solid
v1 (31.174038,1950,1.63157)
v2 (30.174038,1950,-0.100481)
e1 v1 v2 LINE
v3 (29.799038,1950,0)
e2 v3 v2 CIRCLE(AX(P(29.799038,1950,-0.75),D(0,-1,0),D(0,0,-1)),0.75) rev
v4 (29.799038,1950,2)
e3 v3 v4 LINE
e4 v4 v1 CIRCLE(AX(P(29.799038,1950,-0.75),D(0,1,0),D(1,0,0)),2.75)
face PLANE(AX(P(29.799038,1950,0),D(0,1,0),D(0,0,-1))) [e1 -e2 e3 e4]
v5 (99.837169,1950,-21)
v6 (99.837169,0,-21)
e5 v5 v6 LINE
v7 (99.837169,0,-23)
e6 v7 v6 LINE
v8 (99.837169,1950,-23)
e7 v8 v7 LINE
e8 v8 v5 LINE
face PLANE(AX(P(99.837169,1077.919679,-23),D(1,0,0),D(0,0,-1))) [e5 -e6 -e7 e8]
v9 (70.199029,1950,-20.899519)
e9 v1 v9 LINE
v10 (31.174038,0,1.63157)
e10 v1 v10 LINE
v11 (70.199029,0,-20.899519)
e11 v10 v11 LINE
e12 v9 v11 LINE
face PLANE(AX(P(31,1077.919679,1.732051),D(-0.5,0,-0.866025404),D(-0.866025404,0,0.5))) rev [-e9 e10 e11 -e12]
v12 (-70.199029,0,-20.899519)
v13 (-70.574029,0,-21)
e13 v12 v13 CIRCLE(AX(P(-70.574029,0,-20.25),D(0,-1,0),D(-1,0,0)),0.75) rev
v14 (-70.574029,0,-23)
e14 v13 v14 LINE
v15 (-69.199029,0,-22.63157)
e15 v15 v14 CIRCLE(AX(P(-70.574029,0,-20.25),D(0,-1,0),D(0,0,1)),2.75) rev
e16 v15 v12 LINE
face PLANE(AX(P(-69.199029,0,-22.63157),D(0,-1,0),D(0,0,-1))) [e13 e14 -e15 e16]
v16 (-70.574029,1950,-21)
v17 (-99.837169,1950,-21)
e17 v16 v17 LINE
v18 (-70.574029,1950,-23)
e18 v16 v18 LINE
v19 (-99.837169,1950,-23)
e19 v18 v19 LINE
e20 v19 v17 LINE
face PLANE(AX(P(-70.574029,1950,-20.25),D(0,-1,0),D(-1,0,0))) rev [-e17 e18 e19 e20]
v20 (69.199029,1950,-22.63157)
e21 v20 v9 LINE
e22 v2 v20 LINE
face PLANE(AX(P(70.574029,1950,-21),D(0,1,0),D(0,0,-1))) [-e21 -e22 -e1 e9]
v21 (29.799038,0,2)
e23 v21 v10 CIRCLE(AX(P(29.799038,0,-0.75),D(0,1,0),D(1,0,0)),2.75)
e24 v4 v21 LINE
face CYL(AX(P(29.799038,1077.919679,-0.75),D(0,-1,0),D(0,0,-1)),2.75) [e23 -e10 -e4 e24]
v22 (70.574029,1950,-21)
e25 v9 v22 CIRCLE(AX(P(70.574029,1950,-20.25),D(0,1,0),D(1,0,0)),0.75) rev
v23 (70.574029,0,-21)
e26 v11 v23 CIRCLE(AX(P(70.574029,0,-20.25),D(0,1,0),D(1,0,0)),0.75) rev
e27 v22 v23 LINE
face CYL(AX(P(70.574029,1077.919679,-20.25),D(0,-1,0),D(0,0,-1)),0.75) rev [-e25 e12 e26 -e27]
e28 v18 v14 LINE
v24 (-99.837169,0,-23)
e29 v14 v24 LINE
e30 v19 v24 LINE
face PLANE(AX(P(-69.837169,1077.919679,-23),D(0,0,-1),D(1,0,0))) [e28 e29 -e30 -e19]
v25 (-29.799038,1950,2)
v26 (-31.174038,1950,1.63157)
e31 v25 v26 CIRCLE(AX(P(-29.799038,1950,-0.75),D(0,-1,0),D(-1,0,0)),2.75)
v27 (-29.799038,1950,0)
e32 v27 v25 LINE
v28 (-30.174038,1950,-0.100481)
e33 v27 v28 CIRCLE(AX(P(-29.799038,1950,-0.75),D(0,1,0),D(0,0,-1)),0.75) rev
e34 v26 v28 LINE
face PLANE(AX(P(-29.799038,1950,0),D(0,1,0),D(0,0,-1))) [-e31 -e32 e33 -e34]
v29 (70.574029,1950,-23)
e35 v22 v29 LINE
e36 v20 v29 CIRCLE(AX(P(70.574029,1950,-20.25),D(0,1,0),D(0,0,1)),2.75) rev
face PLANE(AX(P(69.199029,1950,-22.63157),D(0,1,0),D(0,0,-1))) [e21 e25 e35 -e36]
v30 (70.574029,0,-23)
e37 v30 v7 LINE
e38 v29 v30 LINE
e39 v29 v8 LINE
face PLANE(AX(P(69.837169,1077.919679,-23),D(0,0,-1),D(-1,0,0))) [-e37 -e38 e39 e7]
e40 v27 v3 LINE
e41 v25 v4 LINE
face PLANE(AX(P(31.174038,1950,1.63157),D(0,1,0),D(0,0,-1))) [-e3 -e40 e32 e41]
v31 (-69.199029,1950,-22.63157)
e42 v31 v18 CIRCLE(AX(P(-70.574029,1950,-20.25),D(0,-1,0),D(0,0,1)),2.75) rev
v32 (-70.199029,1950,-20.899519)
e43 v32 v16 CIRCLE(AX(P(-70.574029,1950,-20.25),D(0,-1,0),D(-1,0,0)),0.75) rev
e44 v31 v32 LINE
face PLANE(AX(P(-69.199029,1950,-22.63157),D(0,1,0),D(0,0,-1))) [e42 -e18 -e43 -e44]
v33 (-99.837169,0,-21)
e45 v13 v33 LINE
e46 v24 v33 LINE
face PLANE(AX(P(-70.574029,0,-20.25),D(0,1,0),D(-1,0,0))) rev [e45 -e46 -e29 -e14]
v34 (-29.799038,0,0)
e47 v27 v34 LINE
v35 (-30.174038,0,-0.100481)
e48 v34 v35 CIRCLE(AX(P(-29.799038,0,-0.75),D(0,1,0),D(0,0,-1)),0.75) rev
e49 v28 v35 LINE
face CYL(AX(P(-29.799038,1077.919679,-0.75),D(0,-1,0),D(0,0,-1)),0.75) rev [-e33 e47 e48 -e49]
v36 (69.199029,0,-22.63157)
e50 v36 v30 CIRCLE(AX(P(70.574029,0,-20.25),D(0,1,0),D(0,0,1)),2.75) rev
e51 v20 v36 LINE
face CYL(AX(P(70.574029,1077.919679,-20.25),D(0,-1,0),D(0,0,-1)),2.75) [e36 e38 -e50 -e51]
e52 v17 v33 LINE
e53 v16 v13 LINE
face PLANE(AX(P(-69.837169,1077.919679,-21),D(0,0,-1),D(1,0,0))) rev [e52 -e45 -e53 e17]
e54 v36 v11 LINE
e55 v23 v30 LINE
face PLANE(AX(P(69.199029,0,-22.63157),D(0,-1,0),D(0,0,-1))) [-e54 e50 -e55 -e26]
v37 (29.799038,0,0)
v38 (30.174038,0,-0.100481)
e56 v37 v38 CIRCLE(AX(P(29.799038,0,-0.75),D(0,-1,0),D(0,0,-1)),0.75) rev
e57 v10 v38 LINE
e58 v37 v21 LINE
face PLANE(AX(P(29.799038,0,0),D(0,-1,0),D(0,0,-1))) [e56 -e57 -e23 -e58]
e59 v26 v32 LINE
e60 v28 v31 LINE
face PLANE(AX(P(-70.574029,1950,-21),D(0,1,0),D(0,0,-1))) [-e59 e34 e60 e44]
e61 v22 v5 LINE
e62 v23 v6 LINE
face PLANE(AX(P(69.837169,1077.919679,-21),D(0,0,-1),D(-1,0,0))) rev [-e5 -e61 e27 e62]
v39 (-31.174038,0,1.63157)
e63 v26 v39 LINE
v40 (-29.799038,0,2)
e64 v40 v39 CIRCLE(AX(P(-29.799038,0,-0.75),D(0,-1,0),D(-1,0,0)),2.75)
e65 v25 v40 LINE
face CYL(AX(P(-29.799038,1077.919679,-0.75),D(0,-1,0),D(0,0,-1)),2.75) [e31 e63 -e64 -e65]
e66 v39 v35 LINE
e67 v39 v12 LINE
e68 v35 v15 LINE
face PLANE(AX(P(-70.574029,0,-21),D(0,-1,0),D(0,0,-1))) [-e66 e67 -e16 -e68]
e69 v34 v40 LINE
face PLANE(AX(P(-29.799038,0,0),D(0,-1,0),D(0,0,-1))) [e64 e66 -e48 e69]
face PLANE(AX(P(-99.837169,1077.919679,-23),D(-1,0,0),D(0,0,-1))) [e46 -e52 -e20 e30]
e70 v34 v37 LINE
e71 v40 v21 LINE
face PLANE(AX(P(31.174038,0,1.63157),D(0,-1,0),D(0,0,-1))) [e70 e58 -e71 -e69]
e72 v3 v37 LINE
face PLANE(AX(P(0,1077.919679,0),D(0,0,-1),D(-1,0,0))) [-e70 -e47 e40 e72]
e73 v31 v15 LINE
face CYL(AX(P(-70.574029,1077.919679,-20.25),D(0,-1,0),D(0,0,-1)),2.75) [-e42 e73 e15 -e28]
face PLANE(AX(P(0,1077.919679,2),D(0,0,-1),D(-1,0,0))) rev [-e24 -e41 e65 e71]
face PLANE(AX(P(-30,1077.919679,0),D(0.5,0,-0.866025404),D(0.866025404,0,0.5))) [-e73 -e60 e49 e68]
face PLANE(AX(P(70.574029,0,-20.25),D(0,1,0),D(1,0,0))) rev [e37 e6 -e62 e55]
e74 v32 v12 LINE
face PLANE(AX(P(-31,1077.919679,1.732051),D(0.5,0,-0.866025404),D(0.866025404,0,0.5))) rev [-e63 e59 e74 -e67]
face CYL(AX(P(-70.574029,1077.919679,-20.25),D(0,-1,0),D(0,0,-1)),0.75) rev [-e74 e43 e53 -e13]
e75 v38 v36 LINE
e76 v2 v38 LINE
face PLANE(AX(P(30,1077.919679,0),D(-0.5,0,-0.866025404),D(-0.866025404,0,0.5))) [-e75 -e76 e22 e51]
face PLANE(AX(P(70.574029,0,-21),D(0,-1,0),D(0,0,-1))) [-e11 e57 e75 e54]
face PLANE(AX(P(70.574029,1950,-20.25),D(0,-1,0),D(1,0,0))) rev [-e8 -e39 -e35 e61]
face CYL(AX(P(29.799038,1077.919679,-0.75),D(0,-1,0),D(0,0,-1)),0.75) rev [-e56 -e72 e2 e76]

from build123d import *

# Parameters (mm, degrees)
SM_BASE_FLANGE_1_DEPTH = 975


# Sheet-metal steps are written as plain solids
with BuildPart() as part:
    # Sketch 1 → Базовая кромка1 (new body)
    with BuildSketch(Plane(origin=(0, 0, 0), x_dir=(1, 0, 0), z_dir=(0, 1, 0))):
        with BuildLine():
            Line((0, 0), (29.799038106, 0))
            ThreePointArc((29.799038106, 0), (29.99315239, 0.02555563), (30.174038106, 0.100480947))
            Line((30.174038106, 0.100480947), (69.199028853, 22.63156986))
            ThreePointArc((69.199028853, 22.63156986), (69.862276479, 22.906296022), (70.574028853, 23))
            Line((70.574028853, 23), (99.837168574, 23))
            Line((99.837168574, 23), (99.837168574, 21))
            Line((99.837168574, 21), (70.574028853, 21))
            ThreePointArc((70.574028853, 21), (70.379914569, 20.97444437), (70.199028853, 20.899519053))
            Line((70.199028853, 20.899519053), (31.174038106, -1.63156986))
            ThreePointArc((31.174038106, -1.63156986), (30.51079048, -1.906296022), (29.799038106, -2))
            Line((29.799038106, -2), (0, -2))
            Line((0, -2), (0, 0))
        make_face()
    extrude(amount=SM_BASE_FLANGE_1_DEPTH)

    # Зеркальное отражение1: part across plane


with BuildPart() as part_1:
    add(part.part)
    add(part.part.mirror(Plane(origin=(0, 1077.919678531, 2), x_dir=(0, 0, 1), z_dir=(-1, 0, 0))))

    # Зеркальное отражение2: part across plane


with BuildPart() as part_2:
    add(part_1.part)
    add(part_1.part.mirror(Plane(origin=(31, 975, 1.732050808), x_dir=(0, 0, 1), z_dir=(0, 1, 0))))


solid = part_2.part
